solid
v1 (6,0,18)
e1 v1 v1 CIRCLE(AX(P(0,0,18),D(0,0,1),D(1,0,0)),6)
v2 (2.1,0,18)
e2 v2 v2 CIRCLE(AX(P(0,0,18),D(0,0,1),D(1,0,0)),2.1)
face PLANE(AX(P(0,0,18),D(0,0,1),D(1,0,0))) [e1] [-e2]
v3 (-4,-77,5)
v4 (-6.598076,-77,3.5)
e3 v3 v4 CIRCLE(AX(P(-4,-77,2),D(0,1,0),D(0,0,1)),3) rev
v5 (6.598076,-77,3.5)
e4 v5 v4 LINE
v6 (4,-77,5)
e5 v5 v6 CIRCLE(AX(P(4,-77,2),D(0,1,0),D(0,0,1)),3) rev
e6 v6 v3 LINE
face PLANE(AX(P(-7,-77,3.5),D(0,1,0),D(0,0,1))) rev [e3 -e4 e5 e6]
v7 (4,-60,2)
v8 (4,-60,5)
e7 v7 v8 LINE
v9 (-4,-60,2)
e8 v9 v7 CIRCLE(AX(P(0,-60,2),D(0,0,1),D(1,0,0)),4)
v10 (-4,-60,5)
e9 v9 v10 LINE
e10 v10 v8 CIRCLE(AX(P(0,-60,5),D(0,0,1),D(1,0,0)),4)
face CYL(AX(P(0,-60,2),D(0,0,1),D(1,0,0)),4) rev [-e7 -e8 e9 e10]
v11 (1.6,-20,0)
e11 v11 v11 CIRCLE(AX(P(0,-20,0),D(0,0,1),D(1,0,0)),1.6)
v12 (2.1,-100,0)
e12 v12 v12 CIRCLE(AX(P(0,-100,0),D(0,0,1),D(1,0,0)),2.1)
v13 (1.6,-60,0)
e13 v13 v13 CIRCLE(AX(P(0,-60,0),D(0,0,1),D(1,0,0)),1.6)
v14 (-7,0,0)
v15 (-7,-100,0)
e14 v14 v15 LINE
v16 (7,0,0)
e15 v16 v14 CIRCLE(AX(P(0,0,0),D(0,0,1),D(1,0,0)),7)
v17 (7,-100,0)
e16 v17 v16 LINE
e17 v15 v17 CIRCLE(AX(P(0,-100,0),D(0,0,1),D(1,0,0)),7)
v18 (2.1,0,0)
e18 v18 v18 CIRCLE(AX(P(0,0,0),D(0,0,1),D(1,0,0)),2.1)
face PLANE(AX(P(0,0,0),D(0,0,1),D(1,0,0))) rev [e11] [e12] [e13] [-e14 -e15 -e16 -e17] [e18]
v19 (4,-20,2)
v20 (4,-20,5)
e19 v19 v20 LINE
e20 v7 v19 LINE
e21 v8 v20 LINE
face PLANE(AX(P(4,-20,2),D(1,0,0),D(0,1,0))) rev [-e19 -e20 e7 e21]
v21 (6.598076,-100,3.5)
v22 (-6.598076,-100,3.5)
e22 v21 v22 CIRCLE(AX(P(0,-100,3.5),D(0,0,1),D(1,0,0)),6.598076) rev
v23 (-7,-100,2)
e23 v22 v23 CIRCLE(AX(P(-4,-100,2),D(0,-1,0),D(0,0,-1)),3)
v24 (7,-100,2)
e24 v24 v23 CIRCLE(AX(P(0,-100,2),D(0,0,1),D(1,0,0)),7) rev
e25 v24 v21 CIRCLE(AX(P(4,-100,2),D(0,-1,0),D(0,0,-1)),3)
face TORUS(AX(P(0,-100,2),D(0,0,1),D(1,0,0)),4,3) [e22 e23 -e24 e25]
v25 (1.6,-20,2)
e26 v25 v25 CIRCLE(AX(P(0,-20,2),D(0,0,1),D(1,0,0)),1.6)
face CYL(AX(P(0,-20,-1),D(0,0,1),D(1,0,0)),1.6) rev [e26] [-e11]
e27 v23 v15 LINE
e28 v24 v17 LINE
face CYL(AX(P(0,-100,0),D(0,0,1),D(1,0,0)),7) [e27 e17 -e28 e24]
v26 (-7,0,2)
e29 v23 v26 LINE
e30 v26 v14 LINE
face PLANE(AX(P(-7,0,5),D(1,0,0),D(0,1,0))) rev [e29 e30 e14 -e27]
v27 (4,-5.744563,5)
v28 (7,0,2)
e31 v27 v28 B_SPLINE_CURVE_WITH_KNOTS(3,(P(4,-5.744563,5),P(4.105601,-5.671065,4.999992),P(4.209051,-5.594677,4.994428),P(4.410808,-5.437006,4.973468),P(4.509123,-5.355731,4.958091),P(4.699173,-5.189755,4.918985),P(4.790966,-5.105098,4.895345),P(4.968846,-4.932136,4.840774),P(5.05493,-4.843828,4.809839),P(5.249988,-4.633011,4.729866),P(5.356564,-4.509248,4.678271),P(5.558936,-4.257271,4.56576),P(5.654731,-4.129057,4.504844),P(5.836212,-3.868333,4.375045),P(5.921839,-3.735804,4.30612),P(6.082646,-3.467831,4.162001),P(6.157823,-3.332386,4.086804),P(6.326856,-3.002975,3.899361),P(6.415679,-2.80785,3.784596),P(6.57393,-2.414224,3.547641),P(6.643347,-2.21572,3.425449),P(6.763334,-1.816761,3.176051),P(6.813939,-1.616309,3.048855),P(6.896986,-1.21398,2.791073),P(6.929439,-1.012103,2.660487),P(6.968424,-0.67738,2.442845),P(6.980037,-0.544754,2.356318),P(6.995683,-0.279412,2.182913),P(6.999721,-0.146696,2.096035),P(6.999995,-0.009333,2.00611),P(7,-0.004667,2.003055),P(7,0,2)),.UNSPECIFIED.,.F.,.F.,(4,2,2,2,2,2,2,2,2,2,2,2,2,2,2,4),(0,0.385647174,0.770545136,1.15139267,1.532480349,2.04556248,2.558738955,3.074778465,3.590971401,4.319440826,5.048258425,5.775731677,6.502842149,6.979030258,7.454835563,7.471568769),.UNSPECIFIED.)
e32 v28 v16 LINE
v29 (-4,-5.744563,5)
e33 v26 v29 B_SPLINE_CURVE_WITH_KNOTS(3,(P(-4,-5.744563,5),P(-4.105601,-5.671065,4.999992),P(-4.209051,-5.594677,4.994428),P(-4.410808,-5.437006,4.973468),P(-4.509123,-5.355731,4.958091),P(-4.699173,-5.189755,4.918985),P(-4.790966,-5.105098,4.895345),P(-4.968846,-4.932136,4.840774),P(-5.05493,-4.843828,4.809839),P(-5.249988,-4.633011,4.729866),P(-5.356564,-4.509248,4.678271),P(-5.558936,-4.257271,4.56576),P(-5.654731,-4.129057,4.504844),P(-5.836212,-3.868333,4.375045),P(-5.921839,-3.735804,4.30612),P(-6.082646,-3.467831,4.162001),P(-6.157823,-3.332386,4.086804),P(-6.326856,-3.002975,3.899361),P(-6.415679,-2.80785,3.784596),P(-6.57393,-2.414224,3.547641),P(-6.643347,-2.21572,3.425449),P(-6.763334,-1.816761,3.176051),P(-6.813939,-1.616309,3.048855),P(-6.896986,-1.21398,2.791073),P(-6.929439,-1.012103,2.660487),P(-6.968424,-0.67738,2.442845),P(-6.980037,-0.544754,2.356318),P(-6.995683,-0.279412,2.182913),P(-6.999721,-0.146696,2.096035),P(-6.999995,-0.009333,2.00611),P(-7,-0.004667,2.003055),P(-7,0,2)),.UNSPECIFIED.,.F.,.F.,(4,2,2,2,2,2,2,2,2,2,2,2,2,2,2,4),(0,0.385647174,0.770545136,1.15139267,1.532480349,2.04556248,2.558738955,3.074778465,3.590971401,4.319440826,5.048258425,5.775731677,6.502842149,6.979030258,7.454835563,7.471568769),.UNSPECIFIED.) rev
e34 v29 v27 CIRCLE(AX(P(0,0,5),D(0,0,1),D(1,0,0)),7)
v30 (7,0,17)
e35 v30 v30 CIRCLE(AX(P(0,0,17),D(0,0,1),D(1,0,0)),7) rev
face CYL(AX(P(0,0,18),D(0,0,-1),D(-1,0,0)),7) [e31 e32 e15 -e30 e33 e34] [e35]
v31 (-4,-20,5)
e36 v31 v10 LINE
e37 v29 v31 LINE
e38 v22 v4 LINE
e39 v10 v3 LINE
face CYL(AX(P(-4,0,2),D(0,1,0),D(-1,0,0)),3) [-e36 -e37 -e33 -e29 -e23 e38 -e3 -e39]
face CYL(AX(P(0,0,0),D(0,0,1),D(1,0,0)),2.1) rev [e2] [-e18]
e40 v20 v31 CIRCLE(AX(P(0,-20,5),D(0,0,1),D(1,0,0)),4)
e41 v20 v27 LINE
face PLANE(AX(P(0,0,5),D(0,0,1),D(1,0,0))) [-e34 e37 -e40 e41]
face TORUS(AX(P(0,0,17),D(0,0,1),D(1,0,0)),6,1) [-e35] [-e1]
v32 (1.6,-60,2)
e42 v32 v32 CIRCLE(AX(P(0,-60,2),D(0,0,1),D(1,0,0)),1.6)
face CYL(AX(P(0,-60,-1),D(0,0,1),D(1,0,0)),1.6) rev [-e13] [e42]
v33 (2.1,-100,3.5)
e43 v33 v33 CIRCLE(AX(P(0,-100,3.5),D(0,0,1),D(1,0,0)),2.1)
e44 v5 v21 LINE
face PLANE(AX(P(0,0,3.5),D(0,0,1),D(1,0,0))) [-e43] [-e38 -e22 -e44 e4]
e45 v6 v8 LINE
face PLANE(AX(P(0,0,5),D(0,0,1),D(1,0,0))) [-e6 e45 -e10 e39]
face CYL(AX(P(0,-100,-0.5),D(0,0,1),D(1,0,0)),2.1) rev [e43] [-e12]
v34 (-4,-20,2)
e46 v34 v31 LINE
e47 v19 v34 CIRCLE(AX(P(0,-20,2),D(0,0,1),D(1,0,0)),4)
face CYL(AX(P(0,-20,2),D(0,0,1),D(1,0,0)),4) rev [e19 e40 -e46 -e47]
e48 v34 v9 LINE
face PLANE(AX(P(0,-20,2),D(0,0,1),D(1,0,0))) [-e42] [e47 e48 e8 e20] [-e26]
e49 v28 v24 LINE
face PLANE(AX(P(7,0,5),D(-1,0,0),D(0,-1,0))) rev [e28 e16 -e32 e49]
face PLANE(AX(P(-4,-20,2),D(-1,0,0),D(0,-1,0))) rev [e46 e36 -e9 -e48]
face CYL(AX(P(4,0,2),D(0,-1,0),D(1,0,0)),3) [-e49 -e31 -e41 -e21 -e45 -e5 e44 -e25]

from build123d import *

# Parameters (mm, degrees)
SKETCH1_R           = 7
BOSS_EXTRUDE1_DEPTH = 18
SKETCH2_W           = 14
SKETCH2_H           = 100
BOSS_EXTRUDE2_DEPTH = 5
SKETCH8_R           = 2.1
CUT_EXTRUDE5_DEPTH  = 18
SKETCH9_R           = 7
BOSS_EXTRUDE4_DEPTH = 5
FILLET3_R           = 3
CUT_EXTRUDE6_DEPTH  = 3
SKETCH10_R          = 1.6
CUT_EXTRUDE7_DEPTH  = 3
SKETCH11_W          = 14
SKETCH11_H          = 30
CUT_EXTRUDE8_DEPTH  = 1.5
SKETCH12_R          = 2.1
CUT_EXTRUDE9_DEPTH  = 4
FILLET4_R           = 1


with BuildPart() as part:
    # Sketch1 → Boss-Extrude1 (new body)
    with BuildSketch(Plane.XY):
        Circle(SKETCH1_R)
    extrude(amount=BOSS_EXTRUDE1_DEPTH)

    # Sketch2 → Boss-Extrude2 (add)
    with BuildSketch(Plane.XY):
        with Locations((0, -50)):
            Rectangle(SKETCH2_W, SKETCH2_H)
    extrude(amount=BOSS_EXTRUDE2_DEPTH)

    # Sketch8 → Cut-Extrude5 (cut)
    with BuildSketch(Plane.XY.offset(18)):
        Circle(SKETCH8_R)
    extrude(amount=-CUT_EXTRUDE5_DEPTH, mode=Mode.SUBTRACT)

    # Sketch9 → Boss-Extrude4 (add)
    with BuildSketch(Plane.XY.offset(5)):
        with Locations((0, -100)):
            Circle(SKETCH9_R)
    extrude(amount=-BOSS_EXTRUDE4_DEPTH)

    # Fillet3
    # the kernel refuses this fillet: 3 mm, written as the material it takes off along each edge
    with BuildSketch(Plane(origin=(7, 7.5, 5), x_dir=(-1, 0, 0), z_dir=(0, -1, 0))) as fillet3_piece_1_section:
        with BuildLine():
            CenterArc((FILLET3_R, FILLET3_R), FILLET3_R, 180, 90)
            Line((0, FILLET3_R), (0, 0))
            Line((0, 0), (FILLET3_R, 0))
        make_face()
    fillet3_piece_1 = extrude(amount=107.5, mode=Mode.PRIVATE)
    fillet3_piece_1 = fillet3_piece_1 - Plane(origin=(0, 0, 4.308954976), x_dir=(1, 0, 0), z_dir=(0, 0, -1)) * Cylinder(7, 227, mode=Mode.PRIVATE)
    add(fillet3_piece_1, mode=Mode.SUBTRACT)
    with BuildSketch(Plane(origin=(0, -100, 5), x_dir=(-1, 0, 0), z_dir=(0, 1, 0))) as fillet3_piece_2:
        with BuildLine():
            CenterArc((7 - FILLET3_R, -FILLET3_R), FILLET3_R, 0, 90)
            Line((7, -FILLET3_R), (7, 0))
            Line((7, 0), (7 - FILLET3_R, 0))
        make_face()
    revolve(axis=Axis((0, -100, 5), (0, 0, 1)), revolution_arc=180, mode=Mode.SUBTRACT)
    with BuildSketch(Plane(origin=(-7, -100, 5), x_dir=(0, 0, -1), z_dir=(0, 1, 0))) as fillet3_piece_3_section:
        with BuildLine():
            CenterArc((FILLET3_R, -FILLET3_R), FILLET3_R, 90, 90)
            Line((0, -FILLET3_R), (0, 0))
            Line((0, 0), (FILLET3_R, 0))
        make_face()
    fillet3_piece_3 = extrude(amount=107.5, mode=Mode.PRIVATE)
    fillet3_piece_3 = fillet3_piece_3 - Plane(origin=(0, 0, 4.308954508), x_dir=(1, 0, 0), z_dir=(0, 0, -1)) * Cylinder(7, 227, mode=Mode.PRIVATE)
    add(fillet3_piece_3, mode=Mode.SUBTRACT)

    # Sketch6 → Cut-Extrude6 (cut)
    with BuildSketch(Plane.XY.offset(5)):
        with BuildLine():
            Line((4, -20), (4, -60))
            ThreePointArc((4, -60), (0, -64), (-4, -60))
            Line((-4, -60), (-4, -20))
            ThreePointArc((-4, -20), (0, -16), (4, -20))
        make_face()
    extrude(amount=-CUT_EXTRUDE6_DEPTH, mode=Mode.SUBTRACT)

    # Sketch10 → Cut-Extrude7 (cut)
    with BuildSketch(Plane.XY.offset(2)):
        with Locations((0, -20)):
            Circle(SKETCH10_R)
        with Locations((0, -60)):
            Circle(SKETCH10_R)
    extrude(amount=-CUT_EXTRUDE7_DEPTH, mode=Mode.SUBTRACT)

    # Sketch11 → Cut-Extrude8 (cut)
    with BuildSketch(Plane.XY.offset(5)):
        with Locations((0, -92)):
            Rectangle(SKETCH11_W, SKETCH11_H)
    extrude(amount=-CUT_EXTRUDE8_DEPTH, mode=Mode.SUBTRACT)

    # Sketch12 → Cut-Extrude9 (cut)
    with BuildSketch(Plane.XY.offset(3.5)):
        with Locations((0, -100)):
            Circle(SKETCH12_R)
    extrude(amount=-CUT_EXTRUDE9_DEPTH, mode=Mode.SUBTRACT)

    # Fillet4
    fillet4_edges = [part.edges().sort_by_distance(p)[0] for p in [
        (-7, 0, 18),
    ]]
    fillet(fillet4_edges, radius=FILLET4_R)


solid = part.part
